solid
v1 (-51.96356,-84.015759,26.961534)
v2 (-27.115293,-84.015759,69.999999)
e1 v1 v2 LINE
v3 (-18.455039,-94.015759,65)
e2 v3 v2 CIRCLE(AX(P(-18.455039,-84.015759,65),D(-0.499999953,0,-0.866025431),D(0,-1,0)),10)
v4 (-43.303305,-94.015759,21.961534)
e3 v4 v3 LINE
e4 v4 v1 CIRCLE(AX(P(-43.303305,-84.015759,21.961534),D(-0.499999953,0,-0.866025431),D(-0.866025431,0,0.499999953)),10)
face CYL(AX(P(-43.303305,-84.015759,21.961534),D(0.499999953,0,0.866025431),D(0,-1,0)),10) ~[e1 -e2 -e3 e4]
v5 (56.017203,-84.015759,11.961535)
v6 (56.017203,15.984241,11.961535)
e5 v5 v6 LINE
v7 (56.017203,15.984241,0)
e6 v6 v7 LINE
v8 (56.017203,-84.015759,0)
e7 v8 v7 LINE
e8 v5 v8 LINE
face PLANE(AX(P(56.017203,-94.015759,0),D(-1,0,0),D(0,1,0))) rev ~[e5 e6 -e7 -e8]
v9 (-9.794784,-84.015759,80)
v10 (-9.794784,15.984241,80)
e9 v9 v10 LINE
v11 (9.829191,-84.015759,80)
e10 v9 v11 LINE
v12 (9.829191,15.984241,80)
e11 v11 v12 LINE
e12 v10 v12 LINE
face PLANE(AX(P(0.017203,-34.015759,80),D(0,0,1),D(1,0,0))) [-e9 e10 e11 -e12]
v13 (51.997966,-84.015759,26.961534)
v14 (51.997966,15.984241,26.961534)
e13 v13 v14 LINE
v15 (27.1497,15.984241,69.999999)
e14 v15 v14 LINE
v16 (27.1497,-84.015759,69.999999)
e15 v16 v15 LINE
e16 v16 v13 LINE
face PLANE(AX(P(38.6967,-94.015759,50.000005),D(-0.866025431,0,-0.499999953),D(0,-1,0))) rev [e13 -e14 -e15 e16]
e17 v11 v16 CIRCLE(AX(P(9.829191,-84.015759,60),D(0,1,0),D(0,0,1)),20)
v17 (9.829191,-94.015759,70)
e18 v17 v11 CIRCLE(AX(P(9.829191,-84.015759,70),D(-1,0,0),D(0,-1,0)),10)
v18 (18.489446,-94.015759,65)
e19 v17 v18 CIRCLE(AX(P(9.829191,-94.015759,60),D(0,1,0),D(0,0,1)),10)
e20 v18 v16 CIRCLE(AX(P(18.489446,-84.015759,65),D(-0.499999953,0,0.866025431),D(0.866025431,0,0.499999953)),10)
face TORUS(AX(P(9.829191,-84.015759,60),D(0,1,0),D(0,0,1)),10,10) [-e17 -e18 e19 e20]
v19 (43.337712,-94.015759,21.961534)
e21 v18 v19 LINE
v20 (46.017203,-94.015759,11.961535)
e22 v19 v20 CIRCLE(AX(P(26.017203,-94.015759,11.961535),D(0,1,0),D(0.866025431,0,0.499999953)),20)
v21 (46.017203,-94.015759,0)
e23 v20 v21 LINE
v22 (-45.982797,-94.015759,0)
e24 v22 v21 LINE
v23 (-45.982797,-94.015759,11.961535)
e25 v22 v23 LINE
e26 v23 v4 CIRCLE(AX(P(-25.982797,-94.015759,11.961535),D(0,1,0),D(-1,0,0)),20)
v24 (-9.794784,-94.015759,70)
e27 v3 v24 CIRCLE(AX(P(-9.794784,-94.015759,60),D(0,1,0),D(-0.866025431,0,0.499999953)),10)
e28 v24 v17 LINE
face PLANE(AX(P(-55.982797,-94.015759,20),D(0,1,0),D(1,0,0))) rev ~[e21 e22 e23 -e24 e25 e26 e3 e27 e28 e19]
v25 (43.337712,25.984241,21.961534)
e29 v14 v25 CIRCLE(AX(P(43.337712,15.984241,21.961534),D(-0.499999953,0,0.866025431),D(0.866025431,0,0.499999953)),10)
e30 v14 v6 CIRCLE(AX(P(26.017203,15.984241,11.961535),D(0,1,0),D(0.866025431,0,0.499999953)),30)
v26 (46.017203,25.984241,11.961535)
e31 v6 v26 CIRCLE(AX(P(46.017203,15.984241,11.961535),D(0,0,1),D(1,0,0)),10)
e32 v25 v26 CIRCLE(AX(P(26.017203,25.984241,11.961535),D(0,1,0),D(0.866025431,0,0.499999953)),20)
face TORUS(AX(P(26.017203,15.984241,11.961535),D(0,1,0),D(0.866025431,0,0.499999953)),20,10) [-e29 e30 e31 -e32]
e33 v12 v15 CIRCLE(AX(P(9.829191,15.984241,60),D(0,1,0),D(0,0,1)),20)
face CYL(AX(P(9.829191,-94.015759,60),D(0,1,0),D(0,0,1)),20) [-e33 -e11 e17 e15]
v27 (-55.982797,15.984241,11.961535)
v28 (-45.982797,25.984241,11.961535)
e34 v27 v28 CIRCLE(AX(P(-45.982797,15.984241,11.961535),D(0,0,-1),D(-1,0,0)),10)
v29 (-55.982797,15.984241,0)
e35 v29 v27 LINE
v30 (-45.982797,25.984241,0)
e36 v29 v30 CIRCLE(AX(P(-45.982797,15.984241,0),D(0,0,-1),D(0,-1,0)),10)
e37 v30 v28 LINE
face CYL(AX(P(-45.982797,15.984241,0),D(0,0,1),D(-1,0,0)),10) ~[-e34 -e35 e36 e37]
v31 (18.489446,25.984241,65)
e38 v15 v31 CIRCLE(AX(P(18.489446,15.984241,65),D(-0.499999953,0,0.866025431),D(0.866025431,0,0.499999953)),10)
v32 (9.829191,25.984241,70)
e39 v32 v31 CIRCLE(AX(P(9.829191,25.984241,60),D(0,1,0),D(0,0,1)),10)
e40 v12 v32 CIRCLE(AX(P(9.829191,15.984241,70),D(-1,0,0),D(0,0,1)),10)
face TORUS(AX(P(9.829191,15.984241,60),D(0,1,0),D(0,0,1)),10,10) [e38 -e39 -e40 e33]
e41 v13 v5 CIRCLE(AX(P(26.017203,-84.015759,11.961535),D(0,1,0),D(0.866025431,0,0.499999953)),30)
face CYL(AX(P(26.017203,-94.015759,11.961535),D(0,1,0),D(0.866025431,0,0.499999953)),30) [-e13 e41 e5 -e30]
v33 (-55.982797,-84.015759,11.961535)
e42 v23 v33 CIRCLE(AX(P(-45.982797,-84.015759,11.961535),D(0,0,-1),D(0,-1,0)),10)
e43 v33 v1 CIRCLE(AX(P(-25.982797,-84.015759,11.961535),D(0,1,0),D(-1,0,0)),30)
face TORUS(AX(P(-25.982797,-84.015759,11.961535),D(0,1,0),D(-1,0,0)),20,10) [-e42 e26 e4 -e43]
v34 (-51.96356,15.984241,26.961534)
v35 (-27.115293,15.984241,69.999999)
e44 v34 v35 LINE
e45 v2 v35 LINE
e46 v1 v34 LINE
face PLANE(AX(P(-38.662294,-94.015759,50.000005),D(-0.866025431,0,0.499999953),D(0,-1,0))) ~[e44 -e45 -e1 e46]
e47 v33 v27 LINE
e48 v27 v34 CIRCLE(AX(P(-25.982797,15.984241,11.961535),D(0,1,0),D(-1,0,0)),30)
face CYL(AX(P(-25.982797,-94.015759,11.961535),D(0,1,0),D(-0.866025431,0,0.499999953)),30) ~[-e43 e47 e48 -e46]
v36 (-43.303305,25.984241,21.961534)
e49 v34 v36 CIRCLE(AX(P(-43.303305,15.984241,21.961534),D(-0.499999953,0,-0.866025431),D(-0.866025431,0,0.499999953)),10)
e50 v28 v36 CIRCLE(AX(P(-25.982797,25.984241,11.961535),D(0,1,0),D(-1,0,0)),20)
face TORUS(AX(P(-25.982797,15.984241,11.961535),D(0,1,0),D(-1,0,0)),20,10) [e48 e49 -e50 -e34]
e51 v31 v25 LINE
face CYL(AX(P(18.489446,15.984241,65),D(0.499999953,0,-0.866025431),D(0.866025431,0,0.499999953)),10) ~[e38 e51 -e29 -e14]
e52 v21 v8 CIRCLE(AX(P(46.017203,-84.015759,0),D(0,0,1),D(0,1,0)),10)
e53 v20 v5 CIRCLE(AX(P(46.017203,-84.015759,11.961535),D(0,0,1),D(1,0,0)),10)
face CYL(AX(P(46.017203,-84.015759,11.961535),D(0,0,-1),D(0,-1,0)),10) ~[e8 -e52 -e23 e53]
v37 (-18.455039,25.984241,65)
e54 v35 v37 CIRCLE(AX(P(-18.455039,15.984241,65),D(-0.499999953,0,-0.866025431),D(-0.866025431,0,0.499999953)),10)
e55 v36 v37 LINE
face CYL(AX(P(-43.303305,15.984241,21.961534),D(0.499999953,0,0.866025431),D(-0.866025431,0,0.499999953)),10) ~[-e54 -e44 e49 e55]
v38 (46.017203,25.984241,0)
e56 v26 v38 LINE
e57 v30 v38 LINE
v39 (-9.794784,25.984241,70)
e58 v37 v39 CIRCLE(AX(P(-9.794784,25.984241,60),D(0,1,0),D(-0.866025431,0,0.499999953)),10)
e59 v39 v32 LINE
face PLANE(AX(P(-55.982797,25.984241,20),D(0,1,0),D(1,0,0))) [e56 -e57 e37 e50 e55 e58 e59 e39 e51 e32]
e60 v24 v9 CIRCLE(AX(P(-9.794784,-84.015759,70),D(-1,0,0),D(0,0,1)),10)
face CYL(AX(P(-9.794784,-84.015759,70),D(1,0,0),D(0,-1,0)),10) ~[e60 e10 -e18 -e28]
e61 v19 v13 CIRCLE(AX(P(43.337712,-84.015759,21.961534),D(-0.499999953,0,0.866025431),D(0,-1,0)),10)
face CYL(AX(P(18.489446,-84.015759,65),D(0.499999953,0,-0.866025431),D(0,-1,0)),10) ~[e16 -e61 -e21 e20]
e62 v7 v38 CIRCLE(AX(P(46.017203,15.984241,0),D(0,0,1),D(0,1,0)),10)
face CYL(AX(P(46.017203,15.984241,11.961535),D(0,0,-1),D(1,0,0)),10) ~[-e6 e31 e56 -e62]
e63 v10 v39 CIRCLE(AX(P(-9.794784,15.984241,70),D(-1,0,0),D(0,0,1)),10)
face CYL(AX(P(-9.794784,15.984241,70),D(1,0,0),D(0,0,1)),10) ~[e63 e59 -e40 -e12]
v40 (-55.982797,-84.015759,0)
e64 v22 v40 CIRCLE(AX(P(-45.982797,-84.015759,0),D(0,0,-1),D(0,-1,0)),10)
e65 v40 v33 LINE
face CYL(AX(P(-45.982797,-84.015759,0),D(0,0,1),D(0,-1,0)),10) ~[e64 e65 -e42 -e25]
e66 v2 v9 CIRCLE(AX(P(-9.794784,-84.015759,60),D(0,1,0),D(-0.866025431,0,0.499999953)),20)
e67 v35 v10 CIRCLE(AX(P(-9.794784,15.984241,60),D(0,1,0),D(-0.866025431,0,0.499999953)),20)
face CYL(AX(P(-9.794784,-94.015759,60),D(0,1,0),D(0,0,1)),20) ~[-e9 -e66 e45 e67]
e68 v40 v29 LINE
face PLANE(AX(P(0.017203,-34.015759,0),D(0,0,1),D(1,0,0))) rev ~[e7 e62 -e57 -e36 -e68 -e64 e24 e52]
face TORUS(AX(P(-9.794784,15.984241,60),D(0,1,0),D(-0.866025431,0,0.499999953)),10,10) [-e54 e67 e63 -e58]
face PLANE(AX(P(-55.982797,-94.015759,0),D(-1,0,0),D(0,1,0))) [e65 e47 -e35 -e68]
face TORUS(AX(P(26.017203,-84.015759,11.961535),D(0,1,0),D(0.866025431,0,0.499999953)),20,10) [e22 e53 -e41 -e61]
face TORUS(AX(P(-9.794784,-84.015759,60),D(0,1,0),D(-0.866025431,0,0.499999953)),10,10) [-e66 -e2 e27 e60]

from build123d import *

# Parameters (mm, degrees)
F0_W     = 112
F0_H     = 120
F1_DEPTH = 20
F2_DEPTH = 60
F3_SIZE2 = 34.641006
F3_SIZE  = 59.99999
F4_SIZE2 = 34.641006
F4_SIZE  = 59.99999
F5_R     = 20
F7_R     = 30
F8_R     = 10


# Not quite as in the source:
# - a fillet or chamfer is up to 0.001 mm smaller than in the source, because OpenCascade refuses the exact size


with BuildPart() as f1:
    # F0 (on Top) → F1 (new body)
    with BuildSketch(Plane.XY):
        with Locations((0.0172033906, -34.0157587473)):
            Rectangle(F0_W, F0_H)
    extrude(amount=F1_DEPTH)


with BuildPart() as f2:
    # F2 (new): a face of the model
    f2_faces = [f1.part.faces().sort_by_distance(p)[0] for p in [
        (0.0172033906, -34.0157587473, 20),
    ]]
    extrude(f2_faces, amount=F2_DEPTH)

    # F3 (size 60 and 34.6410161514 in the source; OpenCascade refuses exactly that, so slightly less here)
    f3_edges = [f2.edges().sort_by_distance(p)[0] for p in [
        (56.017203, -34.015759, 80),
    ]]
    f3_side = f2.faces().sort_by_distance((56.017203, -34.015759, 50))[0]
    chamfer(f3_edges, length=F3_SIZE, length2=F3_SIZE2, reference=f3_side)

    # F4 (size 60 and 34.6410161514 in the source; OpenCascade refuses exactly that, so slightly less here)
    f4_edges = [f2.edges().sort_by_distance(p)[0] for p in [
        (-55.982797, -34.015759, 80),
    ]]
    f4_side = f2.faces().sort_by_distance((-55.982797, -34.015759, 50))[0]
    chamfer(f4_edges, length=F4_SIZE, length2=F4_SIZE2, reference=f4_side)

    # F5
    f5_edges = [f2.edges().sort_by_distance(p)[0] for p in [
        (21.376197, -34.015759, 80),
        (-21.341791, -34.015759, 80),
    ]]
    fillet(f5_edges, radius=F5_R)


with BuildPart() as f1_1:
    add(f1.part)

    # F6: union F2
    add(f2.part)

    # F7
    f7_edges = [f1_1.edges().sort_by_distance(p)[0] for p in [
        (-55.982797, -34.015759, 20),
        (56.017203, -34.015759, 20),
    ]]
    fillet(f7_edges, radius=F7_R)

    # F8
    f8_edges = [f1_1.edges().sort_by_distance(p)[0] for p in [
        (-39.539426, -94.015759, 48.480766),
        (-55.982797, -94.015759, 5.980768),
        (-39.539426, 25.984241, 48.480766),
        (-55.982797, 25.984241, 5.980768),
    ]]
    fillet(f8_edges, radius=F8_R)


solid = f1_1.part
